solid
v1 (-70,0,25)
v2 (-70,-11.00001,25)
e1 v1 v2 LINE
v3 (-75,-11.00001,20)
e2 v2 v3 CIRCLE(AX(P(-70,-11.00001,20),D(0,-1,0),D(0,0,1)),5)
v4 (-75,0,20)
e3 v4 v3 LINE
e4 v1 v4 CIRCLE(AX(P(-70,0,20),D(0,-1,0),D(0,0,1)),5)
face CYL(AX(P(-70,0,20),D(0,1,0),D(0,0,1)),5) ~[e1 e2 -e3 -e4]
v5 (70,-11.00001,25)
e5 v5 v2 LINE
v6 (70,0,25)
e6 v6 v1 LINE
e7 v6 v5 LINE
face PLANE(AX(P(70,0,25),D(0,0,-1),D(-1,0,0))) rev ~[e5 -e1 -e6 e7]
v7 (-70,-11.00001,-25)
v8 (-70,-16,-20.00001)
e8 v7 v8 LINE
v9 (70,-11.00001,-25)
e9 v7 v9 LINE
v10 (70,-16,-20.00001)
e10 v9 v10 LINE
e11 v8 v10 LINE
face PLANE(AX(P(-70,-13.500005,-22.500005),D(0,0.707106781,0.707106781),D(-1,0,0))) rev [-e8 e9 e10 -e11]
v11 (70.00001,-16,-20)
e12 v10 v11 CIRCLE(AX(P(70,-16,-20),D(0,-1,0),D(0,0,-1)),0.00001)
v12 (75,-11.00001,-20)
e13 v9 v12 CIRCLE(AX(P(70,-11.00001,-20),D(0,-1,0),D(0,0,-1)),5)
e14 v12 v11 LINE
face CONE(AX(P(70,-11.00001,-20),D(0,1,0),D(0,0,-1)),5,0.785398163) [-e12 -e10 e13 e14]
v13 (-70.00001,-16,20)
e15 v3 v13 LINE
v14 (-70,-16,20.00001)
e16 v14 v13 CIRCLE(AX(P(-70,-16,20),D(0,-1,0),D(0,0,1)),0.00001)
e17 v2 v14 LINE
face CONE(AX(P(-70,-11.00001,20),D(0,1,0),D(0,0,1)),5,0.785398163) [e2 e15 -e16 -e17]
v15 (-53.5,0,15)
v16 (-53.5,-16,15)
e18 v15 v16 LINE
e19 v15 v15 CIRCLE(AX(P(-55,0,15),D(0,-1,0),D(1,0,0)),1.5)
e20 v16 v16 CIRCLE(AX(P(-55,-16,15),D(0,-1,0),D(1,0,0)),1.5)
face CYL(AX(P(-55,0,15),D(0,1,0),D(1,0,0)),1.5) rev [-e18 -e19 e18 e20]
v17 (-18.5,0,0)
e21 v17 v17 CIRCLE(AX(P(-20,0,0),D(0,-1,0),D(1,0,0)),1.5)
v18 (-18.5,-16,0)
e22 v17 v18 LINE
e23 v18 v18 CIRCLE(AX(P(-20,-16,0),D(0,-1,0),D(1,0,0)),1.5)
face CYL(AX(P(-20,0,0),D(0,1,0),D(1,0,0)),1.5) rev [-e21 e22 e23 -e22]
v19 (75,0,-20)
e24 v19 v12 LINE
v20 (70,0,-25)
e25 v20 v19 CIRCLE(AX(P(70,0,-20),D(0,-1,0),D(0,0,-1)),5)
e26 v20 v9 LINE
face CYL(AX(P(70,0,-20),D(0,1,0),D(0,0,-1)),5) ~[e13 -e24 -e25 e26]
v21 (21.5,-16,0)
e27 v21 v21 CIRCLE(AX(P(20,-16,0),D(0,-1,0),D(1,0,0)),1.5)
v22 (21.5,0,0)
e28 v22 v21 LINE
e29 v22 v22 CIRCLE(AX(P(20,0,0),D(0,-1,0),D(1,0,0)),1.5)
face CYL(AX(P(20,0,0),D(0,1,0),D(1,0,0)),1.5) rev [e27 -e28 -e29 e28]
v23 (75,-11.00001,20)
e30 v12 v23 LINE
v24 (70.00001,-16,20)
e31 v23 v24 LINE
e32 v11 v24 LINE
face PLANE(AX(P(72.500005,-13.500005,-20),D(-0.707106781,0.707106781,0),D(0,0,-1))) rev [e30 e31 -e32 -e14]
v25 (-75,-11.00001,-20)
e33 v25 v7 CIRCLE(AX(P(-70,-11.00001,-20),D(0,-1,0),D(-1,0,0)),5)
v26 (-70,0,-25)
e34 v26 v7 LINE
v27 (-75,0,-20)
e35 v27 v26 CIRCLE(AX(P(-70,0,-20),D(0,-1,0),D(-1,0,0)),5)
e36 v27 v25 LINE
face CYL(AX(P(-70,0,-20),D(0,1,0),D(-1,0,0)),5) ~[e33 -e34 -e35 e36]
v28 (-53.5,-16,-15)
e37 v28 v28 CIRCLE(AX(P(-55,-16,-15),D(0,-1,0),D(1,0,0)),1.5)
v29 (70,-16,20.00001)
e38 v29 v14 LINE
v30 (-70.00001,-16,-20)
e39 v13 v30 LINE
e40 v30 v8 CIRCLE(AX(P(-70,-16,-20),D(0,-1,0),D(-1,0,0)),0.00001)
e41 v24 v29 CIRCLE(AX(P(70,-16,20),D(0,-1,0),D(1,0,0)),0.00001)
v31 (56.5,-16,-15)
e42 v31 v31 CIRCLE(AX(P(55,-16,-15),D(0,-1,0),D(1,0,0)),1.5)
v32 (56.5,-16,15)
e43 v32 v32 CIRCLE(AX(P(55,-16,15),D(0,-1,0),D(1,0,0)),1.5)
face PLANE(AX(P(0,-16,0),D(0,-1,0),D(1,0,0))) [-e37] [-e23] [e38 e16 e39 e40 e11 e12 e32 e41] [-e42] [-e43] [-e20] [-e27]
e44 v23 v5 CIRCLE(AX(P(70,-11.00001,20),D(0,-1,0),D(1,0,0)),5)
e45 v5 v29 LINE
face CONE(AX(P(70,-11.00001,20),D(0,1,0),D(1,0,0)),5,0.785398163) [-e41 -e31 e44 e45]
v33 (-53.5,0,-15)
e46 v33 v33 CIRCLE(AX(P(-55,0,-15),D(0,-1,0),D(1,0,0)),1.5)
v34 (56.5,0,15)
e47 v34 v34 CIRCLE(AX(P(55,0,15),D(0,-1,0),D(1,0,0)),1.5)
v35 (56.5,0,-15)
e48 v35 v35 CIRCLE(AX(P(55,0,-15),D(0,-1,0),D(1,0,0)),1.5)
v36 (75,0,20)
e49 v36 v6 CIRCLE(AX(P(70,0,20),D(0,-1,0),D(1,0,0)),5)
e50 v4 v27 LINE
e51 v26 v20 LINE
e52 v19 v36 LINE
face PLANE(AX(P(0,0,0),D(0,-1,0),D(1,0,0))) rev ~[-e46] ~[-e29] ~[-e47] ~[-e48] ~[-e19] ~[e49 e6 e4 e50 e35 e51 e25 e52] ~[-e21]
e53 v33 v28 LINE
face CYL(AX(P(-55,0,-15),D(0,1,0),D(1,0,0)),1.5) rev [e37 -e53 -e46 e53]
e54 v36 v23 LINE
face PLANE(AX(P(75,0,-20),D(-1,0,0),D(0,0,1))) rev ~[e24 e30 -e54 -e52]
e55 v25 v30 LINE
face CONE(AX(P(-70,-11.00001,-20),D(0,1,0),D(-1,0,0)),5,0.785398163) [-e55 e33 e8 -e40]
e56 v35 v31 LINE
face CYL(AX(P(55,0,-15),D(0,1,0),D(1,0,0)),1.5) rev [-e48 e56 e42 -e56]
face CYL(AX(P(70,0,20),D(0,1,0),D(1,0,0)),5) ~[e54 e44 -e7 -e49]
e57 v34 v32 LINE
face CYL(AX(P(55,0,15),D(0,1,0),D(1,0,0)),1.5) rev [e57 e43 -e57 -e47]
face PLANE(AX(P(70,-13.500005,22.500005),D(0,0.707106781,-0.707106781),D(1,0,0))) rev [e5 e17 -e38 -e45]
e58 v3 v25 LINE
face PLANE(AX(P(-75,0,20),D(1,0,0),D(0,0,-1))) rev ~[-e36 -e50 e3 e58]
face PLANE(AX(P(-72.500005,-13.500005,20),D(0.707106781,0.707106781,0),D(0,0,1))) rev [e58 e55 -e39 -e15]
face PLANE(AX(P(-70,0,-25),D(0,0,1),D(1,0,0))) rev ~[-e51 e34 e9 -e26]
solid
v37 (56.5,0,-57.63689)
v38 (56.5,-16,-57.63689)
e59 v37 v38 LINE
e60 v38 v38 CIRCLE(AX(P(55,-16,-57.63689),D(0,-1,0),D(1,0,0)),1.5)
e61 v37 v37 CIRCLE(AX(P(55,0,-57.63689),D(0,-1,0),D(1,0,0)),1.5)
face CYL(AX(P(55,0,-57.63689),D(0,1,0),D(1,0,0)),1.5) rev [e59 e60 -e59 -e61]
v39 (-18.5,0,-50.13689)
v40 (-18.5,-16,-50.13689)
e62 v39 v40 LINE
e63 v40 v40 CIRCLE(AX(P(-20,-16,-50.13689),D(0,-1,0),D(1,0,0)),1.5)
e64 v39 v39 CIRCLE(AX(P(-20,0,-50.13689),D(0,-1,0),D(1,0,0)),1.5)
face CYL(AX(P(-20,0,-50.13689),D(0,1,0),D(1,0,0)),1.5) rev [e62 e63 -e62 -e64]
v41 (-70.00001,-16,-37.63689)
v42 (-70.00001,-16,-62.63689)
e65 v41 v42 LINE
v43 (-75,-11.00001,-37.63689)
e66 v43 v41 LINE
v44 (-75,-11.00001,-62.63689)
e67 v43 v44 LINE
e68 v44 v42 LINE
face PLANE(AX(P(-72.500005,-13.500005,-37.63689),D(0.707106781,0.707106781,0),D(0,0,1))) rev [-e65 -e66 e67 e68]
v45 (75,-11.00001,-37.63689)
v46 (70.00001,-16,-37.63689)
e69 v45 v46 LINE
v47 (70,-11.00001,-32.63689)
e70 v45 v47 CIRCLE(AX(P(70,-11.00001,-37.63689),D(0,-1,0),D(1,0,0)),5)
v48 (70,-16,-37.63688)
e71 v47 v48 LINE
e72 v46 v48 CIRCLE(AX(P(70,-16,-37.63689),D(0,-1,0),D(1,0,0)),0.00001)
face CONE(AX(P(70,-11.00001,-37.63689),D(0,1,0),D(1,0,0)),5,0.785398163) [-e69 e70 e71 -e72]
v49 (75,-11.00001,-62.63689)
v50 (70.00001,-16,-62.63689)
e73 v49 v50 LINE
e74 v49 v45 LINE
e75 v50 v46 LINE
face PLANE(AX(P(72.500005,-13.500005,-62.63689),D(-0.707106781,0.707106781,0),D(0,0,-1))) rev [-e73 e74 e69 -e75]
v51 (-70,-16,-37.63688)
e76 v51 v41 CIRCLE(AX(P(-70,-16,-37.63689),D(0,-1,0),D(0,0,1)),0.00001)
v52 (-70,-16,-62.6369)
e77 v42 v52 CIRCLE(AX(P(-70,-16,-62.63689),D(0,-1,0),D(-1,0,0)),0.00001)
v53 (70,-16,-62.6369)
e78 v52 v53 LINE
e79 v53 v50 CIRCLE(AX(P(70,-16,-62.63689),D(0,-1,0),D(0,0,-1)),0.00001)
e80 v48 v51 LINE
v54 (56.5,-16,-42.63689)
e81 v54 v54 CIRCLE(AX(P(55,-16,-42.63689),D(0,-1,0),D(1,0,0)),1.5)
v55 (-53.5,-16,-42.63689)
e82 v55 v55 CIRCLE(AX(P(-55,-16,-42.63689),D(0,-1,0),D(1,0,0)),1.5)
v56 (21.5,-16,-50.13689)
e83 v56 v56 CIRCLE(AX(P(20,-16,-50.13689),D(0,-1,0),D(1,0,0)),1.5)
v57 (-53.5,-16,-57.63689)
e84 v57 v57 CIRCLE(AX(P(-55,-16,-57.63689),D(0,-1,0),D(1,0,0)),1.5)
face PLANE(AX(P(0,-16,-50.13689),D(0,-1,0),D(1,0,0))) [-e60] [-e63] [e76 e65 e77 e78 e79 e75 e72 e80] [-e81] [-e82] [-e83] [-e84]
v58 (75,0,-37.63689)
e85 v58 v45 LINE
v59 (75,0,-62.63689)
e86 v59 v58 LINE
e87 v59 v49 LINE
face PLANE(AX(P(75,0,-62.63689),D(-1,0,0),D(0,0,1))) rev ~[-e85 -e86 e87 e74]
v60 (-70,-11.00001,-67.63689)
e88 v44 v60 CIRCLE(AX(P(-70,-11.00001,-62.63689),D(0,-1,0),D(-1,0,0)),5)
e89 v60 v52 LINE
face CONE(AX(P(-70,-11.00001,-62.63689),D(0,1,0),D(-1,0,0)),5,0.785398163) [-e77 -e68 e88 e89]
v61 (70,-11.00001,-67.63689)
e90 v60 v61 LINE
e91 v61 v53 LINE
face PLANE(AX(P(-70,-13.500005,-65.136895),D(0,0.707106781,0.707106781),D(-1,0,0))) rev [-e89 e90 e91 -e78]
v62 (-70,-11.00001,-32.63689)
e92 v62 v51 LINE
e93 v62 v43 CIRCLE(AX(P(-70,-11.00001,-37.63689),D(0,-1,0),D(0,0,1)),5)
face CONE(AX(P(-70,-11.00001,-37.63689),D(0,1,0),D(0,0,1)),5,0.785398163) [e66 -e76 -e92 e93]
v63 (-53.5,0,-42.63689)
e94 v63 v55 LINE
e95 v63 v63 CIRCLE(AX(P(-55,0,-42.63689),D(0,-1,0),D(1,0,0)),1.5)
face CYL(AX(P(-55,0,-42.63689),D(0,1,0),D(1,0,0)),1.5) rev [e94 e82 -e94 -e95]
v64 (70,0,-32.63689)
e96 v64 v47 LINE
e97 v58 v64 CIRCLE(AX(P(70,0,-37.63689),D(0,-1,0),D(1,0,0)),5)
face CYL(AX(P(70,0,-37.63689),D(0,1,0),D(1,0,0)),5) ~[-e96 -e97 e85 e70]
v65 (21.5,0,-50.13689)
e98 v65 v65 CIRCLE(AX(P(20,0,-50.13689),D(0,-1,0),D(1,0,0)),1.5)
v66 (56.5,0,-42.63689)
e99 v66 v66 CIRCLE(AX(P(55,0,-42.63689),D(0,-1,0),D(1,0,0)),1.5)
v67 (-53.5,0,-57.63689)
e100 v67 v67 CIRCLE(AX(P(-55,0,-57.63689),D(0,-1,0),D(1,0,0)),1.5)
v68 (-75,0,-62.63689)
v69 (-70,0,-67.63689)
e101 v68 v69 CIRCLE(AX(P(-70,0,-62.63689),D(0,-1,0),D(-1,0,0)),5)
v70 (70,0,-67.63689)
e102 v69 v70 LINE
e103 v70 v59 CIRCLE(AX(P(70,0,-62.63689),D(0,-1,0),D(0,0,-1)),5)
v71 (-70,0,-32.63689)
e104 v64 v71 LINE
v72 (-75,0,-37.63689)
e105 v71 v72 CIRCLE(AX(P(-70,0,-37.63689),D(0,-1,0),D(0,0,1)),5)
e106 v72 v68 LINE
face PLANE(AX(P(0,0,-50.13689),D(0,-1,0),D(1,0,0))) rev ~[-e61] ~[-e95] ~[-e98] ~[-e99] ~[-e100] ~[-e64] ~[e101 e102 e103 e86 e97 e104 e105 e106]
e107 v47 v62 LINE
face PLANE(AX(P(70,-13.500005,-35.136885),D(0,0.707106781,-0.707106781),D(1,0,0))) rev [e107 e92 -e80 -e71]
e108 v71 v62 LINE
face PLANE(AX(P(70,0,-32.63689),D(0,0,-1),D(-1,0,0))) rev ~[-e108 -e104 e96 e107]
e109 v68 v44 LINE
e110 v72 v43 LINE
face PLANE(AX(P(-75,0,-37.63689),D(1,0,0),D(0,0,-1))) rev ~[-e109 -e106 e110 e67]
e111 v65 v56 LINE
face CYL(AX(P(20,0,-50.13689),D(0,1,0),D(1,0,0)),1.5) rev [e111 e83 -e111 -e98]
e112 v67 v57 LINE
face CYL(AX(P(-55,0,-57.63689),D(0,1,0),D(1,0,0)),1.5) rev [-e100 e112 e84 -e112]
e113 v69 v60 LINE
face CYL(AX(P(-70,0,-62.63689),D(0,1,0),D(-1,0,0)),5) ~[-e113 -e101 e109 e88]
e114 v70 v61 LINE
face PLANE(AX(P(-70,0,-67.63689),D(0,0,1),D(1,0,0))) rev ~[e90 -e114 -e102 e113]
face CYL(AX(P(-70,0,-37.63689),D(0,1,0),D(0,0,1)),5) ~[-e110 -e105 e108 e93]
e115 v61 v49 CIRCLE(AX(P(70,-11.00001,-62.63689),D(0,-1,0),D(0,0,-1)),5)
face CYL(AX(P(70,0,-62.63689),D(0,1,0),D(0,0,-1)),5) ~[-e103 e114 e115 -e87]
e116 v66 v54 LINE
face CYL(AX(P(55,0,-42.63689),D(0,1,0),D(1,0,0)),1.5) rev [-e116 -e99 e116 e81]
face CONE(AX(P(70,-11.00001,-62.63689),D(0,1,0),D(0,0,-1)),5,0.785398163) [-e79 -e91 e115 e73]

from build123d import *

# Parameters (mm, degrees)
F0_R      = 1.5
F1_DEPTH  = 16
F2_SIZE   = 4.99999
F2_2_SIZE = 4.99999


# Not quite as in the source:
# - a fillet or chamfer is up to 0.001 mm smaller than in the source, because OpenCascade refuses the exact size


with BuildPart() as f1:
    # F0 (on Front) → F1 (new body)
    with BuildSketch(Plane.XZ):
        with BuildLine():
            Line((70, 25), (-70, 25))
            ThreePointArc((-70, 25), (-73.5355339059, 23.5355339059), (-75, 20))
            Line((-75, 20), (-75, -20))
            ThreePointArc((-75, -20), (-73.5355339059, -23.5355339059), (-70, -25))
            Line((-70, -25), (70, -25))
            ThreePointArc((70, -25), (73.5355339059, -23.5355339059), (75, -20))
            Line((75, -20), (75, 20))
            ThreePointArc((75, 20), (73.5355339059, 23.5355339059), (70, 25))
        make_face()
        with Locations((-55, -15)):
            Circle(F0_R, mode=Mode.SUBTRACT)
        with Locations((-20, 0)):
            Circle(F0_R, mode=Mode.SUBTRACT)
        with Locations((-55, 15)):
            Circle(F0_R, mode=Mode.SUBTRACT)
        with Locations((20, 0)):
            Circle(F0_R, mode=Mode.SUBTRACT)
        with Locations((55, -15)):
            Circle(F0_R, mode=Mode.SUBTRACT)
        with Locations((55, 15)):
            Circle(F0_R, mode=Mode.SUBTRACT)
    extrude(amount=F1_DEPTH)

    # F2 (size 5 in the source; OpenCascade refuses exactly that, so slightly less here)
    f2_edges = [f1.edges().sort_by_distance(p)[0] for p in [
        (0, -16, 25),
        (-73.535534, -16, 23.535534),
        (-75, -16, 0),
        (-73.535534, -16, -23.535534),
        (0, -16, -25),
        (73.535534, -16, -23.535534),
        (75, -16, 0),
        (73.535534, -16, 23.535534),
    ]]
    chamfer(f2_edges, length=F2_SIZE)


with BuildPart() as f1b:
    # F0 (on Front) → F1, piece 2 (new body)
    with BuildSketch(Plane.XZ):
        with BuildLine():
            ThreePointArc((-70, -32.6368902624), (-73.5355339059, -34.1013563564), (-75, -37.6368902624))
            Line((-75, -37.6368902624), (-75, -62.6368902624))
            ThreePointArc((-75, -62.6368902624), (-73.5355339059, -66.1724241683), (-70, -67.6368902624))
            Line((-70, -67.6368902624), (70, -67.6368902624))
            ThreePointArc((70, -67.6368902624), (73.5355339059, -66.1724241683), (75, -62.6368902624))
            Line((75, -62.6368902624), (75, -37.6368902624))
            ThreePointArc((75, -37.6368902624), (73.5355339059, -34.1013563564), (70, -32.6368902624))
            Line((70, -32.6368902624), (-70, -32.6368902624))
        make_face()
        with Locations((-55, -57.6368902624)):
            Circle(F0_R, mode=Mode.SUBTRACT)
        with Locations((-20, -50.1368902624)):
            Circle(F0_R, mode=Mode.SUBTRACT)
        with Locations((-55, -42.6368902624)):
            Circle(F0_R, mode=Mode.SUBTRACT)
        with Locations((20, -50.1368902624)):
            Circle(F0_R, mode=Mode.SUBTRACT)
        with Locations((55, -57.6368902624)):
            Circle(F0_R, mode=Mode.SUBTRACT)
        with Locations((55, -42.6368902624)):
            Circle(F0_R, mode=Mode.SUBTRACT)
    extrude(amount=F1_DEPTH)

    # F2#2 (size 5 in the source; OpenCascade refuses exactly that, so slightly less here)
    f2_2_edges = [f1b.edges().sort_by_distance(p)[0] for p in [
        (0, -16, -32.63689),
        (0, -16, -67.63689),
        (73.535534, -16, -66.172424),
        (75, -16, -50.13689),
        (73.535534, -16, -34.101356),
        (-73.535534, -16, -34.101356),
        (-75, -16, -50.13689),
        (-73.535534, -16, -66.172424),
    ]]
    chamfer(f2_2_edges, length=F2_2_SIZE)


solid = Compound([f1.part, f1b.part])
